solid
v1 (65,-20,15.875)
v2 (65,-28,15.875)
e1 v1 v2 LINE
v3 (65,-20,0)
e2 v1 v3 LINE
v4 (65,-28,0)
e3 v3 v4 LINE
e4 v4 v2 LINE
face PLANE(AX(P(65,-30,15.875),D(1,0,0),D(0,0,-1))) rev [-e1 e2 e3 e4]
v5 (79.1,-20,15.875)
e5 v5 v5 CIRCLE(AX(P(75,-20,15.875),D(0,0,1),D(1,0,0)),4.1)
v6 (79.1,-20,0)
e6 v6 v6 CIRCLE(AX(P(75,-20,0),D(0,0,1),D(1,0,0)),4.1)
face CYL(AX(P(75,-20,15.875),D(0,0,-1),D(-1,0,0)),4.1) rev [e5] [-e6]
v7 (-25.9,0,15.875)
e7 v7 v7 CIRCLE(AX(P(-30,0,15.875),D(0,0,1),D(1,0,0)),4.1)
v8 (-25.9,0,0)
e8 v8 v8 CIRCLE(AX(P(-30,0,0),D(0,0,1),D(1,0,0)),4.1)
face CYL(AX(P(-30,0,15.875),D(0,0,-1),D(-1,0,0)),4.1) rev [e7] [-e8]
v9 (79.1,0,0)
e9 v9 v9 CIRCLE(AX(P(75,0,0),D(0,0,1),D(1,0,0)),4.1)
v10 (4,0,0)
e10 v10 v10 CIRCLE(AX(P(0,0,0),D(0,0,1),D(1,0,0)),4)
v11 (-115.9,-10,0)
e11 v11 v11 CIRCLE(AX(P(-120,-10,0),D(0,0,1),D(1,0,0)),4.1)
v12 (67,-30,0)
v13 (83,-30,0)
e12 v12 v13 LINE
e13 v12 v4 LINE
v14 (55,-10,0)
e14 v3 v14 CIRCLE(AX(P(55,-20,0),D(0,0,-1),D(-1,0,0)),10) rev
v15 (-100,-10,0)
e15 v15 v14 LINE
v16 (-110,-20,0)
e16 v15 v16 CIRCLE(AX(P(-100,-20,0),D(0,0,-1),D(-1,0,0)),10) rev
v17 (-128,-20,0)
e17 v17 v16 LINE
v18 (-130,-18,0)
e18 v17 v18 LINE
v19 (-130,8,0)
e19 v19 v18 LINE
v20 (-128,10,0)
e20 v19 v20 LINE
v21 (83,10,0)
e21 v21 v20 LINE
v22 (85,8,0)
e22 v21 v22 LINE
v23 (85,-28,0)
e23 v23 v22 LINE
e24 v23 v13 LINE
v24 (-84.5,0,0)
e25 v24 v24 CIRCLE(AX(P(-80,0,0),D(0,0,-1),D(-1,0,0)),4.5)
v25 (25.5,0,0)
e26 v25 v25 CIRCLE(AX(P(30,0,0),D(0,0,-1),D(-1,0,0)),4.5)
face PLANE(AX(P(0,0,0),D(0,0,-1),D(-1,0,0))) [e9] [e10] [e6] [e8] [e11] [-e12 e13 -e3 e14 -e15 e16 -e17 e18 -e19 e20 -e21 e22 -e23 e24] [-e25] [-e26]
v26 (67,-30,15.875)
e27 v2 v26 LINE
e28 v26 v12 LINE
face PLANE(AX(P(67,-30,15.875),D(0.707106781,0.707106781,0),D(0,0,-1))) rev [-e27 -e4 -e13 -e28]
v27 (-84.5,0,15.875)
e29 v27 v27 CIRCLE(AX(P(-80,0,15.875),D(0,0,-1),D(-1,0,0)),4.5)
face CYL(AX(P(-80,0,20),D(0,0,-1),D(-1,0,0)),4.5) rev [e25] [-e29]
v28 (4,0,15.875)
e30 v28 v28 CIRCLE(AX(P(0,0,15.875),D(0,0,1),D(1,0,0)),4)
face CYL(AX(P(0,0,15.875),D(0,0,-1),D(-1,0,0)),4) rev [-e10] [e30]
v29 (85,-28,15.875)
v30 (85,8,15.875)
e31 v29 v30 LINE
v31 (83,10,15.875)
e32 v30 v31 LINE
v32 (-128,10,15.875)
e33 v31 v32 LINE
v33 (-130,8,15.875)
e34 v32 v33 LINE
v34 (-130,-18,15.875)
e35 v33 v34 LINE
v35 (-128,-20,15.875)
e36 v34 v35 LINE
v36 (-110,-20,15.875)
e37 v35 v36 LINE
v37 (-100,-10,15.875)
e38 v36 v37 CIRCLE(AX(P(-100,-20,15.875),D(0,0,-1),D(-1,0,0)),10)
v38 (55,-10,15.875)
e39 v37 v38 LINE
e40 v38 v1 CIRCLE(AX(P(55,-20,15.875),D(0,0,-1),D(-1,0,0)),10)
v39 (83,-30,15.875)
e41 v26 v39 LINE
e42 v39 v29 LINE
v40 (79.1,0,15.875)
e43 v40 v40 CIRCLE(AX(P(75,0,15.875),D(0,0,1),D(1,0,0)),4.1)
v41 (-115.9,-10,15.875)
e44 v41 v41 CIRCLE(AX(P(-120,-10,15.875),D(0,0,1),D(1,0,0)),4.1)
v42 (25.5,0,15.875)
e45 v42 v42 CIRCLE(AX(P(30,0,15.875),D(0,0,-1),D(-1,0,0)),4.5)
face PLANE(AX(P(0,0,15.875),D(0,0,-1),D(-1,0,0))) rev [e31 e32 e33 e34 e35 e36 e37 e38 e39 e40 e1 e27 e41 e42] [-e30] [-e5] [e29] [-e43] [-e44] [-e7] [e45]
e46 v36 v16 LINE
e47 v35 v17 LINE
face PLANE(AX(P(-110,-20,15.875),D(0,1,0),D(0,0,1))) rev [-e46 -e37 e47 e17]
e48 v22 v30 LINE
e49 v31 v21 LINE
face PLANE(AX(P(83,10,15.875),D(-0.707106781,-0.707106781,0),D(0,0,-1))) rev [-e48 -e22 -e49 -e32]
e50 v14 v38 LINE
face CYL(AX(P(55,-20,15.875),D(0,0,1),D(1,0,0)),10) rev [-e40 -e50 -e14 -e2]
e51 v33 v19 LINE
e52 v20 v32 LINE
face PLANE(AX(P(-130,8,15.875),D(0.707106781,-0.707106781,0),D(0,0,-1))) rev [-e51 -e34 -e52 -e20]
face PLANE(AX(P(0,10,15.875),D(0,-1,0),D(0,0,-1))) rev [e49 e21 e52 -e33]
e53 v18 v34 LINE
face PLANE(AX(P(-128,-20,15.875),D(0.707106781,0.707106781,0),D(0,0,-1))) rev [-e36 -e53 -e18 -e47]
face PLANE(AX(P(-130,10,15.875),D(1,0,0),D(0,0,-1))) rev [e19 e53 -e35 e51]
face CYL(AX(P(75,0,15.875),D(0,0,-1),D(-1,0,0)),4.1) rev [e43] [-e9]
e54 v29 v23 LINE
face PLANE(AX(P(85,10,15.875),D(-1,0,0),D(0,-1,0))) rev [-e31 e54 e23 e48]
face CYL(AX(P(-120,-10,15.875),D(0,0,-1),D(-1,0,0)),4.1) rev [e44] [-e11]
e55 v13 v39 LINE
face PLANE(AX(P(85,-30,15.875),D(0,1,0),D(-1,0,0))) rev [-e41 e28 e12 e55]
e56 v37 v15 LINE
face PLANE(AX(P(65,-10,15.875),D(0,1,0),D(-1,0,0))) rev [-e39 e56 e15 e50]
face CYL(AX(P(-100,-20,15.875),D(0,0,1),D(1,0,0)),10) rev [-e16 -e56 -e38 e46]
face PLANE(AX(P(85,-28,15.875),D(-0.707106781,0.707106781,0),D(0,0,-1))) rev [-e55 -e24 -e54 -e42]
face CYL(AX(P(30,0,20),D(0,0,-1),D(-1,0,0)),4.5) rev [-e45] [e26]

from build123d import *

# Parameters (mm, degrees)
SKETCH_1_R          = 4
SKETCH_1_R_2        = 4.1
EXTRUDE_1_DEPTH     = 15.875
FILLET_1_R          = 10
CHAMFER_1_SIZE      = 2
SKETCH_2_R          = 4.5
CUT_EXTRUDE_1_DEPTH = 20
SKETCH_3_R          = 4.5
CUT_EXTRUDE_2_DEPTH = 20


with BuildPart() as part:
    # 草图1 → 凸台-拉伸1 (new body)
    with BuildSketch(Plane.XY):
        Polygon((0, 10), (-130, 10), (-130, -20), (-110, -20), (-110, -10), (0, -10), (65, -10), (65, -30), (85, -30), (85, 10), align=None)
        Circle(SKETCH_1_R, mode=Mode.SUBTRACT)
        with Locations((-30, 0)):
            Circle(SKETCH_1_R_2, mode=Mode.SUBTRACT)
        with Locations((75, 0)):
            Circle(SKETCH_1_R_2, mode=Mode.SUBTRACT)
        with Locations((75, -20)):
            Circle(SKETCH_1_R_2, mode=Mode.SUBTRACT)
        with Locations((-120, -10)):
            Circle(SKETCH_1_R_2, mode=Mode.SUBTRACT)
    extrude(amount=EXTRUDE_1_DEPTH)

    # 圆角1
    fillet_1_edges = [part.edges().sort_by_distance(p)[0] for p in [
        (65, -10, 7.9375),
        (-110, -10, 7.9375),
    ]]
    fillet(fillet_1_edges, radius=FILLET_1_R - 0.0001)  # a hair under: the kernel refuses the full size

    # 倒角1
    chamfer_1_edges = [part.edges().sort_by_distance(p)[0] for p in [
        (-130, 10, 7.9375),
        (85, 10, 7.9375),
        (85, -30, 7.9375),
        (65, -30, 7.9375),
        (-130, -20, 7.9375),
    ]]
    chamfer(chamfer_1_edges, length=CHAMFER_1_SIZE)

    # 草图2 → 切除-拉伸1 (cut)
    with BuildSketch(Plane(origin=(0, 0, 0), x_dir=(-1, 0, 0), z_dir=(0, 0, -1))):
        with Locations((-30, 0)):
            Circle(SKETCH_2_R)
    extrude(amount=-CUT_EXTRUDE_1_DEPTH, mode=Mode.SUBTRACT)

    # 草图3 → 切除-拉伸2 (cut)
    with BuildSketch(Plane(origin=(0, 0, 0), x_dir=(-1, 0, 0), z_dir=(0, 0, -1))):
        with Locations((80, 0)):
            Circle(SKETCH_3_R)
    extrude(amount=-CUT_EXTRUDE_2_DEPTH, mode=Mode.SUBTRACT)


solid = part.part
